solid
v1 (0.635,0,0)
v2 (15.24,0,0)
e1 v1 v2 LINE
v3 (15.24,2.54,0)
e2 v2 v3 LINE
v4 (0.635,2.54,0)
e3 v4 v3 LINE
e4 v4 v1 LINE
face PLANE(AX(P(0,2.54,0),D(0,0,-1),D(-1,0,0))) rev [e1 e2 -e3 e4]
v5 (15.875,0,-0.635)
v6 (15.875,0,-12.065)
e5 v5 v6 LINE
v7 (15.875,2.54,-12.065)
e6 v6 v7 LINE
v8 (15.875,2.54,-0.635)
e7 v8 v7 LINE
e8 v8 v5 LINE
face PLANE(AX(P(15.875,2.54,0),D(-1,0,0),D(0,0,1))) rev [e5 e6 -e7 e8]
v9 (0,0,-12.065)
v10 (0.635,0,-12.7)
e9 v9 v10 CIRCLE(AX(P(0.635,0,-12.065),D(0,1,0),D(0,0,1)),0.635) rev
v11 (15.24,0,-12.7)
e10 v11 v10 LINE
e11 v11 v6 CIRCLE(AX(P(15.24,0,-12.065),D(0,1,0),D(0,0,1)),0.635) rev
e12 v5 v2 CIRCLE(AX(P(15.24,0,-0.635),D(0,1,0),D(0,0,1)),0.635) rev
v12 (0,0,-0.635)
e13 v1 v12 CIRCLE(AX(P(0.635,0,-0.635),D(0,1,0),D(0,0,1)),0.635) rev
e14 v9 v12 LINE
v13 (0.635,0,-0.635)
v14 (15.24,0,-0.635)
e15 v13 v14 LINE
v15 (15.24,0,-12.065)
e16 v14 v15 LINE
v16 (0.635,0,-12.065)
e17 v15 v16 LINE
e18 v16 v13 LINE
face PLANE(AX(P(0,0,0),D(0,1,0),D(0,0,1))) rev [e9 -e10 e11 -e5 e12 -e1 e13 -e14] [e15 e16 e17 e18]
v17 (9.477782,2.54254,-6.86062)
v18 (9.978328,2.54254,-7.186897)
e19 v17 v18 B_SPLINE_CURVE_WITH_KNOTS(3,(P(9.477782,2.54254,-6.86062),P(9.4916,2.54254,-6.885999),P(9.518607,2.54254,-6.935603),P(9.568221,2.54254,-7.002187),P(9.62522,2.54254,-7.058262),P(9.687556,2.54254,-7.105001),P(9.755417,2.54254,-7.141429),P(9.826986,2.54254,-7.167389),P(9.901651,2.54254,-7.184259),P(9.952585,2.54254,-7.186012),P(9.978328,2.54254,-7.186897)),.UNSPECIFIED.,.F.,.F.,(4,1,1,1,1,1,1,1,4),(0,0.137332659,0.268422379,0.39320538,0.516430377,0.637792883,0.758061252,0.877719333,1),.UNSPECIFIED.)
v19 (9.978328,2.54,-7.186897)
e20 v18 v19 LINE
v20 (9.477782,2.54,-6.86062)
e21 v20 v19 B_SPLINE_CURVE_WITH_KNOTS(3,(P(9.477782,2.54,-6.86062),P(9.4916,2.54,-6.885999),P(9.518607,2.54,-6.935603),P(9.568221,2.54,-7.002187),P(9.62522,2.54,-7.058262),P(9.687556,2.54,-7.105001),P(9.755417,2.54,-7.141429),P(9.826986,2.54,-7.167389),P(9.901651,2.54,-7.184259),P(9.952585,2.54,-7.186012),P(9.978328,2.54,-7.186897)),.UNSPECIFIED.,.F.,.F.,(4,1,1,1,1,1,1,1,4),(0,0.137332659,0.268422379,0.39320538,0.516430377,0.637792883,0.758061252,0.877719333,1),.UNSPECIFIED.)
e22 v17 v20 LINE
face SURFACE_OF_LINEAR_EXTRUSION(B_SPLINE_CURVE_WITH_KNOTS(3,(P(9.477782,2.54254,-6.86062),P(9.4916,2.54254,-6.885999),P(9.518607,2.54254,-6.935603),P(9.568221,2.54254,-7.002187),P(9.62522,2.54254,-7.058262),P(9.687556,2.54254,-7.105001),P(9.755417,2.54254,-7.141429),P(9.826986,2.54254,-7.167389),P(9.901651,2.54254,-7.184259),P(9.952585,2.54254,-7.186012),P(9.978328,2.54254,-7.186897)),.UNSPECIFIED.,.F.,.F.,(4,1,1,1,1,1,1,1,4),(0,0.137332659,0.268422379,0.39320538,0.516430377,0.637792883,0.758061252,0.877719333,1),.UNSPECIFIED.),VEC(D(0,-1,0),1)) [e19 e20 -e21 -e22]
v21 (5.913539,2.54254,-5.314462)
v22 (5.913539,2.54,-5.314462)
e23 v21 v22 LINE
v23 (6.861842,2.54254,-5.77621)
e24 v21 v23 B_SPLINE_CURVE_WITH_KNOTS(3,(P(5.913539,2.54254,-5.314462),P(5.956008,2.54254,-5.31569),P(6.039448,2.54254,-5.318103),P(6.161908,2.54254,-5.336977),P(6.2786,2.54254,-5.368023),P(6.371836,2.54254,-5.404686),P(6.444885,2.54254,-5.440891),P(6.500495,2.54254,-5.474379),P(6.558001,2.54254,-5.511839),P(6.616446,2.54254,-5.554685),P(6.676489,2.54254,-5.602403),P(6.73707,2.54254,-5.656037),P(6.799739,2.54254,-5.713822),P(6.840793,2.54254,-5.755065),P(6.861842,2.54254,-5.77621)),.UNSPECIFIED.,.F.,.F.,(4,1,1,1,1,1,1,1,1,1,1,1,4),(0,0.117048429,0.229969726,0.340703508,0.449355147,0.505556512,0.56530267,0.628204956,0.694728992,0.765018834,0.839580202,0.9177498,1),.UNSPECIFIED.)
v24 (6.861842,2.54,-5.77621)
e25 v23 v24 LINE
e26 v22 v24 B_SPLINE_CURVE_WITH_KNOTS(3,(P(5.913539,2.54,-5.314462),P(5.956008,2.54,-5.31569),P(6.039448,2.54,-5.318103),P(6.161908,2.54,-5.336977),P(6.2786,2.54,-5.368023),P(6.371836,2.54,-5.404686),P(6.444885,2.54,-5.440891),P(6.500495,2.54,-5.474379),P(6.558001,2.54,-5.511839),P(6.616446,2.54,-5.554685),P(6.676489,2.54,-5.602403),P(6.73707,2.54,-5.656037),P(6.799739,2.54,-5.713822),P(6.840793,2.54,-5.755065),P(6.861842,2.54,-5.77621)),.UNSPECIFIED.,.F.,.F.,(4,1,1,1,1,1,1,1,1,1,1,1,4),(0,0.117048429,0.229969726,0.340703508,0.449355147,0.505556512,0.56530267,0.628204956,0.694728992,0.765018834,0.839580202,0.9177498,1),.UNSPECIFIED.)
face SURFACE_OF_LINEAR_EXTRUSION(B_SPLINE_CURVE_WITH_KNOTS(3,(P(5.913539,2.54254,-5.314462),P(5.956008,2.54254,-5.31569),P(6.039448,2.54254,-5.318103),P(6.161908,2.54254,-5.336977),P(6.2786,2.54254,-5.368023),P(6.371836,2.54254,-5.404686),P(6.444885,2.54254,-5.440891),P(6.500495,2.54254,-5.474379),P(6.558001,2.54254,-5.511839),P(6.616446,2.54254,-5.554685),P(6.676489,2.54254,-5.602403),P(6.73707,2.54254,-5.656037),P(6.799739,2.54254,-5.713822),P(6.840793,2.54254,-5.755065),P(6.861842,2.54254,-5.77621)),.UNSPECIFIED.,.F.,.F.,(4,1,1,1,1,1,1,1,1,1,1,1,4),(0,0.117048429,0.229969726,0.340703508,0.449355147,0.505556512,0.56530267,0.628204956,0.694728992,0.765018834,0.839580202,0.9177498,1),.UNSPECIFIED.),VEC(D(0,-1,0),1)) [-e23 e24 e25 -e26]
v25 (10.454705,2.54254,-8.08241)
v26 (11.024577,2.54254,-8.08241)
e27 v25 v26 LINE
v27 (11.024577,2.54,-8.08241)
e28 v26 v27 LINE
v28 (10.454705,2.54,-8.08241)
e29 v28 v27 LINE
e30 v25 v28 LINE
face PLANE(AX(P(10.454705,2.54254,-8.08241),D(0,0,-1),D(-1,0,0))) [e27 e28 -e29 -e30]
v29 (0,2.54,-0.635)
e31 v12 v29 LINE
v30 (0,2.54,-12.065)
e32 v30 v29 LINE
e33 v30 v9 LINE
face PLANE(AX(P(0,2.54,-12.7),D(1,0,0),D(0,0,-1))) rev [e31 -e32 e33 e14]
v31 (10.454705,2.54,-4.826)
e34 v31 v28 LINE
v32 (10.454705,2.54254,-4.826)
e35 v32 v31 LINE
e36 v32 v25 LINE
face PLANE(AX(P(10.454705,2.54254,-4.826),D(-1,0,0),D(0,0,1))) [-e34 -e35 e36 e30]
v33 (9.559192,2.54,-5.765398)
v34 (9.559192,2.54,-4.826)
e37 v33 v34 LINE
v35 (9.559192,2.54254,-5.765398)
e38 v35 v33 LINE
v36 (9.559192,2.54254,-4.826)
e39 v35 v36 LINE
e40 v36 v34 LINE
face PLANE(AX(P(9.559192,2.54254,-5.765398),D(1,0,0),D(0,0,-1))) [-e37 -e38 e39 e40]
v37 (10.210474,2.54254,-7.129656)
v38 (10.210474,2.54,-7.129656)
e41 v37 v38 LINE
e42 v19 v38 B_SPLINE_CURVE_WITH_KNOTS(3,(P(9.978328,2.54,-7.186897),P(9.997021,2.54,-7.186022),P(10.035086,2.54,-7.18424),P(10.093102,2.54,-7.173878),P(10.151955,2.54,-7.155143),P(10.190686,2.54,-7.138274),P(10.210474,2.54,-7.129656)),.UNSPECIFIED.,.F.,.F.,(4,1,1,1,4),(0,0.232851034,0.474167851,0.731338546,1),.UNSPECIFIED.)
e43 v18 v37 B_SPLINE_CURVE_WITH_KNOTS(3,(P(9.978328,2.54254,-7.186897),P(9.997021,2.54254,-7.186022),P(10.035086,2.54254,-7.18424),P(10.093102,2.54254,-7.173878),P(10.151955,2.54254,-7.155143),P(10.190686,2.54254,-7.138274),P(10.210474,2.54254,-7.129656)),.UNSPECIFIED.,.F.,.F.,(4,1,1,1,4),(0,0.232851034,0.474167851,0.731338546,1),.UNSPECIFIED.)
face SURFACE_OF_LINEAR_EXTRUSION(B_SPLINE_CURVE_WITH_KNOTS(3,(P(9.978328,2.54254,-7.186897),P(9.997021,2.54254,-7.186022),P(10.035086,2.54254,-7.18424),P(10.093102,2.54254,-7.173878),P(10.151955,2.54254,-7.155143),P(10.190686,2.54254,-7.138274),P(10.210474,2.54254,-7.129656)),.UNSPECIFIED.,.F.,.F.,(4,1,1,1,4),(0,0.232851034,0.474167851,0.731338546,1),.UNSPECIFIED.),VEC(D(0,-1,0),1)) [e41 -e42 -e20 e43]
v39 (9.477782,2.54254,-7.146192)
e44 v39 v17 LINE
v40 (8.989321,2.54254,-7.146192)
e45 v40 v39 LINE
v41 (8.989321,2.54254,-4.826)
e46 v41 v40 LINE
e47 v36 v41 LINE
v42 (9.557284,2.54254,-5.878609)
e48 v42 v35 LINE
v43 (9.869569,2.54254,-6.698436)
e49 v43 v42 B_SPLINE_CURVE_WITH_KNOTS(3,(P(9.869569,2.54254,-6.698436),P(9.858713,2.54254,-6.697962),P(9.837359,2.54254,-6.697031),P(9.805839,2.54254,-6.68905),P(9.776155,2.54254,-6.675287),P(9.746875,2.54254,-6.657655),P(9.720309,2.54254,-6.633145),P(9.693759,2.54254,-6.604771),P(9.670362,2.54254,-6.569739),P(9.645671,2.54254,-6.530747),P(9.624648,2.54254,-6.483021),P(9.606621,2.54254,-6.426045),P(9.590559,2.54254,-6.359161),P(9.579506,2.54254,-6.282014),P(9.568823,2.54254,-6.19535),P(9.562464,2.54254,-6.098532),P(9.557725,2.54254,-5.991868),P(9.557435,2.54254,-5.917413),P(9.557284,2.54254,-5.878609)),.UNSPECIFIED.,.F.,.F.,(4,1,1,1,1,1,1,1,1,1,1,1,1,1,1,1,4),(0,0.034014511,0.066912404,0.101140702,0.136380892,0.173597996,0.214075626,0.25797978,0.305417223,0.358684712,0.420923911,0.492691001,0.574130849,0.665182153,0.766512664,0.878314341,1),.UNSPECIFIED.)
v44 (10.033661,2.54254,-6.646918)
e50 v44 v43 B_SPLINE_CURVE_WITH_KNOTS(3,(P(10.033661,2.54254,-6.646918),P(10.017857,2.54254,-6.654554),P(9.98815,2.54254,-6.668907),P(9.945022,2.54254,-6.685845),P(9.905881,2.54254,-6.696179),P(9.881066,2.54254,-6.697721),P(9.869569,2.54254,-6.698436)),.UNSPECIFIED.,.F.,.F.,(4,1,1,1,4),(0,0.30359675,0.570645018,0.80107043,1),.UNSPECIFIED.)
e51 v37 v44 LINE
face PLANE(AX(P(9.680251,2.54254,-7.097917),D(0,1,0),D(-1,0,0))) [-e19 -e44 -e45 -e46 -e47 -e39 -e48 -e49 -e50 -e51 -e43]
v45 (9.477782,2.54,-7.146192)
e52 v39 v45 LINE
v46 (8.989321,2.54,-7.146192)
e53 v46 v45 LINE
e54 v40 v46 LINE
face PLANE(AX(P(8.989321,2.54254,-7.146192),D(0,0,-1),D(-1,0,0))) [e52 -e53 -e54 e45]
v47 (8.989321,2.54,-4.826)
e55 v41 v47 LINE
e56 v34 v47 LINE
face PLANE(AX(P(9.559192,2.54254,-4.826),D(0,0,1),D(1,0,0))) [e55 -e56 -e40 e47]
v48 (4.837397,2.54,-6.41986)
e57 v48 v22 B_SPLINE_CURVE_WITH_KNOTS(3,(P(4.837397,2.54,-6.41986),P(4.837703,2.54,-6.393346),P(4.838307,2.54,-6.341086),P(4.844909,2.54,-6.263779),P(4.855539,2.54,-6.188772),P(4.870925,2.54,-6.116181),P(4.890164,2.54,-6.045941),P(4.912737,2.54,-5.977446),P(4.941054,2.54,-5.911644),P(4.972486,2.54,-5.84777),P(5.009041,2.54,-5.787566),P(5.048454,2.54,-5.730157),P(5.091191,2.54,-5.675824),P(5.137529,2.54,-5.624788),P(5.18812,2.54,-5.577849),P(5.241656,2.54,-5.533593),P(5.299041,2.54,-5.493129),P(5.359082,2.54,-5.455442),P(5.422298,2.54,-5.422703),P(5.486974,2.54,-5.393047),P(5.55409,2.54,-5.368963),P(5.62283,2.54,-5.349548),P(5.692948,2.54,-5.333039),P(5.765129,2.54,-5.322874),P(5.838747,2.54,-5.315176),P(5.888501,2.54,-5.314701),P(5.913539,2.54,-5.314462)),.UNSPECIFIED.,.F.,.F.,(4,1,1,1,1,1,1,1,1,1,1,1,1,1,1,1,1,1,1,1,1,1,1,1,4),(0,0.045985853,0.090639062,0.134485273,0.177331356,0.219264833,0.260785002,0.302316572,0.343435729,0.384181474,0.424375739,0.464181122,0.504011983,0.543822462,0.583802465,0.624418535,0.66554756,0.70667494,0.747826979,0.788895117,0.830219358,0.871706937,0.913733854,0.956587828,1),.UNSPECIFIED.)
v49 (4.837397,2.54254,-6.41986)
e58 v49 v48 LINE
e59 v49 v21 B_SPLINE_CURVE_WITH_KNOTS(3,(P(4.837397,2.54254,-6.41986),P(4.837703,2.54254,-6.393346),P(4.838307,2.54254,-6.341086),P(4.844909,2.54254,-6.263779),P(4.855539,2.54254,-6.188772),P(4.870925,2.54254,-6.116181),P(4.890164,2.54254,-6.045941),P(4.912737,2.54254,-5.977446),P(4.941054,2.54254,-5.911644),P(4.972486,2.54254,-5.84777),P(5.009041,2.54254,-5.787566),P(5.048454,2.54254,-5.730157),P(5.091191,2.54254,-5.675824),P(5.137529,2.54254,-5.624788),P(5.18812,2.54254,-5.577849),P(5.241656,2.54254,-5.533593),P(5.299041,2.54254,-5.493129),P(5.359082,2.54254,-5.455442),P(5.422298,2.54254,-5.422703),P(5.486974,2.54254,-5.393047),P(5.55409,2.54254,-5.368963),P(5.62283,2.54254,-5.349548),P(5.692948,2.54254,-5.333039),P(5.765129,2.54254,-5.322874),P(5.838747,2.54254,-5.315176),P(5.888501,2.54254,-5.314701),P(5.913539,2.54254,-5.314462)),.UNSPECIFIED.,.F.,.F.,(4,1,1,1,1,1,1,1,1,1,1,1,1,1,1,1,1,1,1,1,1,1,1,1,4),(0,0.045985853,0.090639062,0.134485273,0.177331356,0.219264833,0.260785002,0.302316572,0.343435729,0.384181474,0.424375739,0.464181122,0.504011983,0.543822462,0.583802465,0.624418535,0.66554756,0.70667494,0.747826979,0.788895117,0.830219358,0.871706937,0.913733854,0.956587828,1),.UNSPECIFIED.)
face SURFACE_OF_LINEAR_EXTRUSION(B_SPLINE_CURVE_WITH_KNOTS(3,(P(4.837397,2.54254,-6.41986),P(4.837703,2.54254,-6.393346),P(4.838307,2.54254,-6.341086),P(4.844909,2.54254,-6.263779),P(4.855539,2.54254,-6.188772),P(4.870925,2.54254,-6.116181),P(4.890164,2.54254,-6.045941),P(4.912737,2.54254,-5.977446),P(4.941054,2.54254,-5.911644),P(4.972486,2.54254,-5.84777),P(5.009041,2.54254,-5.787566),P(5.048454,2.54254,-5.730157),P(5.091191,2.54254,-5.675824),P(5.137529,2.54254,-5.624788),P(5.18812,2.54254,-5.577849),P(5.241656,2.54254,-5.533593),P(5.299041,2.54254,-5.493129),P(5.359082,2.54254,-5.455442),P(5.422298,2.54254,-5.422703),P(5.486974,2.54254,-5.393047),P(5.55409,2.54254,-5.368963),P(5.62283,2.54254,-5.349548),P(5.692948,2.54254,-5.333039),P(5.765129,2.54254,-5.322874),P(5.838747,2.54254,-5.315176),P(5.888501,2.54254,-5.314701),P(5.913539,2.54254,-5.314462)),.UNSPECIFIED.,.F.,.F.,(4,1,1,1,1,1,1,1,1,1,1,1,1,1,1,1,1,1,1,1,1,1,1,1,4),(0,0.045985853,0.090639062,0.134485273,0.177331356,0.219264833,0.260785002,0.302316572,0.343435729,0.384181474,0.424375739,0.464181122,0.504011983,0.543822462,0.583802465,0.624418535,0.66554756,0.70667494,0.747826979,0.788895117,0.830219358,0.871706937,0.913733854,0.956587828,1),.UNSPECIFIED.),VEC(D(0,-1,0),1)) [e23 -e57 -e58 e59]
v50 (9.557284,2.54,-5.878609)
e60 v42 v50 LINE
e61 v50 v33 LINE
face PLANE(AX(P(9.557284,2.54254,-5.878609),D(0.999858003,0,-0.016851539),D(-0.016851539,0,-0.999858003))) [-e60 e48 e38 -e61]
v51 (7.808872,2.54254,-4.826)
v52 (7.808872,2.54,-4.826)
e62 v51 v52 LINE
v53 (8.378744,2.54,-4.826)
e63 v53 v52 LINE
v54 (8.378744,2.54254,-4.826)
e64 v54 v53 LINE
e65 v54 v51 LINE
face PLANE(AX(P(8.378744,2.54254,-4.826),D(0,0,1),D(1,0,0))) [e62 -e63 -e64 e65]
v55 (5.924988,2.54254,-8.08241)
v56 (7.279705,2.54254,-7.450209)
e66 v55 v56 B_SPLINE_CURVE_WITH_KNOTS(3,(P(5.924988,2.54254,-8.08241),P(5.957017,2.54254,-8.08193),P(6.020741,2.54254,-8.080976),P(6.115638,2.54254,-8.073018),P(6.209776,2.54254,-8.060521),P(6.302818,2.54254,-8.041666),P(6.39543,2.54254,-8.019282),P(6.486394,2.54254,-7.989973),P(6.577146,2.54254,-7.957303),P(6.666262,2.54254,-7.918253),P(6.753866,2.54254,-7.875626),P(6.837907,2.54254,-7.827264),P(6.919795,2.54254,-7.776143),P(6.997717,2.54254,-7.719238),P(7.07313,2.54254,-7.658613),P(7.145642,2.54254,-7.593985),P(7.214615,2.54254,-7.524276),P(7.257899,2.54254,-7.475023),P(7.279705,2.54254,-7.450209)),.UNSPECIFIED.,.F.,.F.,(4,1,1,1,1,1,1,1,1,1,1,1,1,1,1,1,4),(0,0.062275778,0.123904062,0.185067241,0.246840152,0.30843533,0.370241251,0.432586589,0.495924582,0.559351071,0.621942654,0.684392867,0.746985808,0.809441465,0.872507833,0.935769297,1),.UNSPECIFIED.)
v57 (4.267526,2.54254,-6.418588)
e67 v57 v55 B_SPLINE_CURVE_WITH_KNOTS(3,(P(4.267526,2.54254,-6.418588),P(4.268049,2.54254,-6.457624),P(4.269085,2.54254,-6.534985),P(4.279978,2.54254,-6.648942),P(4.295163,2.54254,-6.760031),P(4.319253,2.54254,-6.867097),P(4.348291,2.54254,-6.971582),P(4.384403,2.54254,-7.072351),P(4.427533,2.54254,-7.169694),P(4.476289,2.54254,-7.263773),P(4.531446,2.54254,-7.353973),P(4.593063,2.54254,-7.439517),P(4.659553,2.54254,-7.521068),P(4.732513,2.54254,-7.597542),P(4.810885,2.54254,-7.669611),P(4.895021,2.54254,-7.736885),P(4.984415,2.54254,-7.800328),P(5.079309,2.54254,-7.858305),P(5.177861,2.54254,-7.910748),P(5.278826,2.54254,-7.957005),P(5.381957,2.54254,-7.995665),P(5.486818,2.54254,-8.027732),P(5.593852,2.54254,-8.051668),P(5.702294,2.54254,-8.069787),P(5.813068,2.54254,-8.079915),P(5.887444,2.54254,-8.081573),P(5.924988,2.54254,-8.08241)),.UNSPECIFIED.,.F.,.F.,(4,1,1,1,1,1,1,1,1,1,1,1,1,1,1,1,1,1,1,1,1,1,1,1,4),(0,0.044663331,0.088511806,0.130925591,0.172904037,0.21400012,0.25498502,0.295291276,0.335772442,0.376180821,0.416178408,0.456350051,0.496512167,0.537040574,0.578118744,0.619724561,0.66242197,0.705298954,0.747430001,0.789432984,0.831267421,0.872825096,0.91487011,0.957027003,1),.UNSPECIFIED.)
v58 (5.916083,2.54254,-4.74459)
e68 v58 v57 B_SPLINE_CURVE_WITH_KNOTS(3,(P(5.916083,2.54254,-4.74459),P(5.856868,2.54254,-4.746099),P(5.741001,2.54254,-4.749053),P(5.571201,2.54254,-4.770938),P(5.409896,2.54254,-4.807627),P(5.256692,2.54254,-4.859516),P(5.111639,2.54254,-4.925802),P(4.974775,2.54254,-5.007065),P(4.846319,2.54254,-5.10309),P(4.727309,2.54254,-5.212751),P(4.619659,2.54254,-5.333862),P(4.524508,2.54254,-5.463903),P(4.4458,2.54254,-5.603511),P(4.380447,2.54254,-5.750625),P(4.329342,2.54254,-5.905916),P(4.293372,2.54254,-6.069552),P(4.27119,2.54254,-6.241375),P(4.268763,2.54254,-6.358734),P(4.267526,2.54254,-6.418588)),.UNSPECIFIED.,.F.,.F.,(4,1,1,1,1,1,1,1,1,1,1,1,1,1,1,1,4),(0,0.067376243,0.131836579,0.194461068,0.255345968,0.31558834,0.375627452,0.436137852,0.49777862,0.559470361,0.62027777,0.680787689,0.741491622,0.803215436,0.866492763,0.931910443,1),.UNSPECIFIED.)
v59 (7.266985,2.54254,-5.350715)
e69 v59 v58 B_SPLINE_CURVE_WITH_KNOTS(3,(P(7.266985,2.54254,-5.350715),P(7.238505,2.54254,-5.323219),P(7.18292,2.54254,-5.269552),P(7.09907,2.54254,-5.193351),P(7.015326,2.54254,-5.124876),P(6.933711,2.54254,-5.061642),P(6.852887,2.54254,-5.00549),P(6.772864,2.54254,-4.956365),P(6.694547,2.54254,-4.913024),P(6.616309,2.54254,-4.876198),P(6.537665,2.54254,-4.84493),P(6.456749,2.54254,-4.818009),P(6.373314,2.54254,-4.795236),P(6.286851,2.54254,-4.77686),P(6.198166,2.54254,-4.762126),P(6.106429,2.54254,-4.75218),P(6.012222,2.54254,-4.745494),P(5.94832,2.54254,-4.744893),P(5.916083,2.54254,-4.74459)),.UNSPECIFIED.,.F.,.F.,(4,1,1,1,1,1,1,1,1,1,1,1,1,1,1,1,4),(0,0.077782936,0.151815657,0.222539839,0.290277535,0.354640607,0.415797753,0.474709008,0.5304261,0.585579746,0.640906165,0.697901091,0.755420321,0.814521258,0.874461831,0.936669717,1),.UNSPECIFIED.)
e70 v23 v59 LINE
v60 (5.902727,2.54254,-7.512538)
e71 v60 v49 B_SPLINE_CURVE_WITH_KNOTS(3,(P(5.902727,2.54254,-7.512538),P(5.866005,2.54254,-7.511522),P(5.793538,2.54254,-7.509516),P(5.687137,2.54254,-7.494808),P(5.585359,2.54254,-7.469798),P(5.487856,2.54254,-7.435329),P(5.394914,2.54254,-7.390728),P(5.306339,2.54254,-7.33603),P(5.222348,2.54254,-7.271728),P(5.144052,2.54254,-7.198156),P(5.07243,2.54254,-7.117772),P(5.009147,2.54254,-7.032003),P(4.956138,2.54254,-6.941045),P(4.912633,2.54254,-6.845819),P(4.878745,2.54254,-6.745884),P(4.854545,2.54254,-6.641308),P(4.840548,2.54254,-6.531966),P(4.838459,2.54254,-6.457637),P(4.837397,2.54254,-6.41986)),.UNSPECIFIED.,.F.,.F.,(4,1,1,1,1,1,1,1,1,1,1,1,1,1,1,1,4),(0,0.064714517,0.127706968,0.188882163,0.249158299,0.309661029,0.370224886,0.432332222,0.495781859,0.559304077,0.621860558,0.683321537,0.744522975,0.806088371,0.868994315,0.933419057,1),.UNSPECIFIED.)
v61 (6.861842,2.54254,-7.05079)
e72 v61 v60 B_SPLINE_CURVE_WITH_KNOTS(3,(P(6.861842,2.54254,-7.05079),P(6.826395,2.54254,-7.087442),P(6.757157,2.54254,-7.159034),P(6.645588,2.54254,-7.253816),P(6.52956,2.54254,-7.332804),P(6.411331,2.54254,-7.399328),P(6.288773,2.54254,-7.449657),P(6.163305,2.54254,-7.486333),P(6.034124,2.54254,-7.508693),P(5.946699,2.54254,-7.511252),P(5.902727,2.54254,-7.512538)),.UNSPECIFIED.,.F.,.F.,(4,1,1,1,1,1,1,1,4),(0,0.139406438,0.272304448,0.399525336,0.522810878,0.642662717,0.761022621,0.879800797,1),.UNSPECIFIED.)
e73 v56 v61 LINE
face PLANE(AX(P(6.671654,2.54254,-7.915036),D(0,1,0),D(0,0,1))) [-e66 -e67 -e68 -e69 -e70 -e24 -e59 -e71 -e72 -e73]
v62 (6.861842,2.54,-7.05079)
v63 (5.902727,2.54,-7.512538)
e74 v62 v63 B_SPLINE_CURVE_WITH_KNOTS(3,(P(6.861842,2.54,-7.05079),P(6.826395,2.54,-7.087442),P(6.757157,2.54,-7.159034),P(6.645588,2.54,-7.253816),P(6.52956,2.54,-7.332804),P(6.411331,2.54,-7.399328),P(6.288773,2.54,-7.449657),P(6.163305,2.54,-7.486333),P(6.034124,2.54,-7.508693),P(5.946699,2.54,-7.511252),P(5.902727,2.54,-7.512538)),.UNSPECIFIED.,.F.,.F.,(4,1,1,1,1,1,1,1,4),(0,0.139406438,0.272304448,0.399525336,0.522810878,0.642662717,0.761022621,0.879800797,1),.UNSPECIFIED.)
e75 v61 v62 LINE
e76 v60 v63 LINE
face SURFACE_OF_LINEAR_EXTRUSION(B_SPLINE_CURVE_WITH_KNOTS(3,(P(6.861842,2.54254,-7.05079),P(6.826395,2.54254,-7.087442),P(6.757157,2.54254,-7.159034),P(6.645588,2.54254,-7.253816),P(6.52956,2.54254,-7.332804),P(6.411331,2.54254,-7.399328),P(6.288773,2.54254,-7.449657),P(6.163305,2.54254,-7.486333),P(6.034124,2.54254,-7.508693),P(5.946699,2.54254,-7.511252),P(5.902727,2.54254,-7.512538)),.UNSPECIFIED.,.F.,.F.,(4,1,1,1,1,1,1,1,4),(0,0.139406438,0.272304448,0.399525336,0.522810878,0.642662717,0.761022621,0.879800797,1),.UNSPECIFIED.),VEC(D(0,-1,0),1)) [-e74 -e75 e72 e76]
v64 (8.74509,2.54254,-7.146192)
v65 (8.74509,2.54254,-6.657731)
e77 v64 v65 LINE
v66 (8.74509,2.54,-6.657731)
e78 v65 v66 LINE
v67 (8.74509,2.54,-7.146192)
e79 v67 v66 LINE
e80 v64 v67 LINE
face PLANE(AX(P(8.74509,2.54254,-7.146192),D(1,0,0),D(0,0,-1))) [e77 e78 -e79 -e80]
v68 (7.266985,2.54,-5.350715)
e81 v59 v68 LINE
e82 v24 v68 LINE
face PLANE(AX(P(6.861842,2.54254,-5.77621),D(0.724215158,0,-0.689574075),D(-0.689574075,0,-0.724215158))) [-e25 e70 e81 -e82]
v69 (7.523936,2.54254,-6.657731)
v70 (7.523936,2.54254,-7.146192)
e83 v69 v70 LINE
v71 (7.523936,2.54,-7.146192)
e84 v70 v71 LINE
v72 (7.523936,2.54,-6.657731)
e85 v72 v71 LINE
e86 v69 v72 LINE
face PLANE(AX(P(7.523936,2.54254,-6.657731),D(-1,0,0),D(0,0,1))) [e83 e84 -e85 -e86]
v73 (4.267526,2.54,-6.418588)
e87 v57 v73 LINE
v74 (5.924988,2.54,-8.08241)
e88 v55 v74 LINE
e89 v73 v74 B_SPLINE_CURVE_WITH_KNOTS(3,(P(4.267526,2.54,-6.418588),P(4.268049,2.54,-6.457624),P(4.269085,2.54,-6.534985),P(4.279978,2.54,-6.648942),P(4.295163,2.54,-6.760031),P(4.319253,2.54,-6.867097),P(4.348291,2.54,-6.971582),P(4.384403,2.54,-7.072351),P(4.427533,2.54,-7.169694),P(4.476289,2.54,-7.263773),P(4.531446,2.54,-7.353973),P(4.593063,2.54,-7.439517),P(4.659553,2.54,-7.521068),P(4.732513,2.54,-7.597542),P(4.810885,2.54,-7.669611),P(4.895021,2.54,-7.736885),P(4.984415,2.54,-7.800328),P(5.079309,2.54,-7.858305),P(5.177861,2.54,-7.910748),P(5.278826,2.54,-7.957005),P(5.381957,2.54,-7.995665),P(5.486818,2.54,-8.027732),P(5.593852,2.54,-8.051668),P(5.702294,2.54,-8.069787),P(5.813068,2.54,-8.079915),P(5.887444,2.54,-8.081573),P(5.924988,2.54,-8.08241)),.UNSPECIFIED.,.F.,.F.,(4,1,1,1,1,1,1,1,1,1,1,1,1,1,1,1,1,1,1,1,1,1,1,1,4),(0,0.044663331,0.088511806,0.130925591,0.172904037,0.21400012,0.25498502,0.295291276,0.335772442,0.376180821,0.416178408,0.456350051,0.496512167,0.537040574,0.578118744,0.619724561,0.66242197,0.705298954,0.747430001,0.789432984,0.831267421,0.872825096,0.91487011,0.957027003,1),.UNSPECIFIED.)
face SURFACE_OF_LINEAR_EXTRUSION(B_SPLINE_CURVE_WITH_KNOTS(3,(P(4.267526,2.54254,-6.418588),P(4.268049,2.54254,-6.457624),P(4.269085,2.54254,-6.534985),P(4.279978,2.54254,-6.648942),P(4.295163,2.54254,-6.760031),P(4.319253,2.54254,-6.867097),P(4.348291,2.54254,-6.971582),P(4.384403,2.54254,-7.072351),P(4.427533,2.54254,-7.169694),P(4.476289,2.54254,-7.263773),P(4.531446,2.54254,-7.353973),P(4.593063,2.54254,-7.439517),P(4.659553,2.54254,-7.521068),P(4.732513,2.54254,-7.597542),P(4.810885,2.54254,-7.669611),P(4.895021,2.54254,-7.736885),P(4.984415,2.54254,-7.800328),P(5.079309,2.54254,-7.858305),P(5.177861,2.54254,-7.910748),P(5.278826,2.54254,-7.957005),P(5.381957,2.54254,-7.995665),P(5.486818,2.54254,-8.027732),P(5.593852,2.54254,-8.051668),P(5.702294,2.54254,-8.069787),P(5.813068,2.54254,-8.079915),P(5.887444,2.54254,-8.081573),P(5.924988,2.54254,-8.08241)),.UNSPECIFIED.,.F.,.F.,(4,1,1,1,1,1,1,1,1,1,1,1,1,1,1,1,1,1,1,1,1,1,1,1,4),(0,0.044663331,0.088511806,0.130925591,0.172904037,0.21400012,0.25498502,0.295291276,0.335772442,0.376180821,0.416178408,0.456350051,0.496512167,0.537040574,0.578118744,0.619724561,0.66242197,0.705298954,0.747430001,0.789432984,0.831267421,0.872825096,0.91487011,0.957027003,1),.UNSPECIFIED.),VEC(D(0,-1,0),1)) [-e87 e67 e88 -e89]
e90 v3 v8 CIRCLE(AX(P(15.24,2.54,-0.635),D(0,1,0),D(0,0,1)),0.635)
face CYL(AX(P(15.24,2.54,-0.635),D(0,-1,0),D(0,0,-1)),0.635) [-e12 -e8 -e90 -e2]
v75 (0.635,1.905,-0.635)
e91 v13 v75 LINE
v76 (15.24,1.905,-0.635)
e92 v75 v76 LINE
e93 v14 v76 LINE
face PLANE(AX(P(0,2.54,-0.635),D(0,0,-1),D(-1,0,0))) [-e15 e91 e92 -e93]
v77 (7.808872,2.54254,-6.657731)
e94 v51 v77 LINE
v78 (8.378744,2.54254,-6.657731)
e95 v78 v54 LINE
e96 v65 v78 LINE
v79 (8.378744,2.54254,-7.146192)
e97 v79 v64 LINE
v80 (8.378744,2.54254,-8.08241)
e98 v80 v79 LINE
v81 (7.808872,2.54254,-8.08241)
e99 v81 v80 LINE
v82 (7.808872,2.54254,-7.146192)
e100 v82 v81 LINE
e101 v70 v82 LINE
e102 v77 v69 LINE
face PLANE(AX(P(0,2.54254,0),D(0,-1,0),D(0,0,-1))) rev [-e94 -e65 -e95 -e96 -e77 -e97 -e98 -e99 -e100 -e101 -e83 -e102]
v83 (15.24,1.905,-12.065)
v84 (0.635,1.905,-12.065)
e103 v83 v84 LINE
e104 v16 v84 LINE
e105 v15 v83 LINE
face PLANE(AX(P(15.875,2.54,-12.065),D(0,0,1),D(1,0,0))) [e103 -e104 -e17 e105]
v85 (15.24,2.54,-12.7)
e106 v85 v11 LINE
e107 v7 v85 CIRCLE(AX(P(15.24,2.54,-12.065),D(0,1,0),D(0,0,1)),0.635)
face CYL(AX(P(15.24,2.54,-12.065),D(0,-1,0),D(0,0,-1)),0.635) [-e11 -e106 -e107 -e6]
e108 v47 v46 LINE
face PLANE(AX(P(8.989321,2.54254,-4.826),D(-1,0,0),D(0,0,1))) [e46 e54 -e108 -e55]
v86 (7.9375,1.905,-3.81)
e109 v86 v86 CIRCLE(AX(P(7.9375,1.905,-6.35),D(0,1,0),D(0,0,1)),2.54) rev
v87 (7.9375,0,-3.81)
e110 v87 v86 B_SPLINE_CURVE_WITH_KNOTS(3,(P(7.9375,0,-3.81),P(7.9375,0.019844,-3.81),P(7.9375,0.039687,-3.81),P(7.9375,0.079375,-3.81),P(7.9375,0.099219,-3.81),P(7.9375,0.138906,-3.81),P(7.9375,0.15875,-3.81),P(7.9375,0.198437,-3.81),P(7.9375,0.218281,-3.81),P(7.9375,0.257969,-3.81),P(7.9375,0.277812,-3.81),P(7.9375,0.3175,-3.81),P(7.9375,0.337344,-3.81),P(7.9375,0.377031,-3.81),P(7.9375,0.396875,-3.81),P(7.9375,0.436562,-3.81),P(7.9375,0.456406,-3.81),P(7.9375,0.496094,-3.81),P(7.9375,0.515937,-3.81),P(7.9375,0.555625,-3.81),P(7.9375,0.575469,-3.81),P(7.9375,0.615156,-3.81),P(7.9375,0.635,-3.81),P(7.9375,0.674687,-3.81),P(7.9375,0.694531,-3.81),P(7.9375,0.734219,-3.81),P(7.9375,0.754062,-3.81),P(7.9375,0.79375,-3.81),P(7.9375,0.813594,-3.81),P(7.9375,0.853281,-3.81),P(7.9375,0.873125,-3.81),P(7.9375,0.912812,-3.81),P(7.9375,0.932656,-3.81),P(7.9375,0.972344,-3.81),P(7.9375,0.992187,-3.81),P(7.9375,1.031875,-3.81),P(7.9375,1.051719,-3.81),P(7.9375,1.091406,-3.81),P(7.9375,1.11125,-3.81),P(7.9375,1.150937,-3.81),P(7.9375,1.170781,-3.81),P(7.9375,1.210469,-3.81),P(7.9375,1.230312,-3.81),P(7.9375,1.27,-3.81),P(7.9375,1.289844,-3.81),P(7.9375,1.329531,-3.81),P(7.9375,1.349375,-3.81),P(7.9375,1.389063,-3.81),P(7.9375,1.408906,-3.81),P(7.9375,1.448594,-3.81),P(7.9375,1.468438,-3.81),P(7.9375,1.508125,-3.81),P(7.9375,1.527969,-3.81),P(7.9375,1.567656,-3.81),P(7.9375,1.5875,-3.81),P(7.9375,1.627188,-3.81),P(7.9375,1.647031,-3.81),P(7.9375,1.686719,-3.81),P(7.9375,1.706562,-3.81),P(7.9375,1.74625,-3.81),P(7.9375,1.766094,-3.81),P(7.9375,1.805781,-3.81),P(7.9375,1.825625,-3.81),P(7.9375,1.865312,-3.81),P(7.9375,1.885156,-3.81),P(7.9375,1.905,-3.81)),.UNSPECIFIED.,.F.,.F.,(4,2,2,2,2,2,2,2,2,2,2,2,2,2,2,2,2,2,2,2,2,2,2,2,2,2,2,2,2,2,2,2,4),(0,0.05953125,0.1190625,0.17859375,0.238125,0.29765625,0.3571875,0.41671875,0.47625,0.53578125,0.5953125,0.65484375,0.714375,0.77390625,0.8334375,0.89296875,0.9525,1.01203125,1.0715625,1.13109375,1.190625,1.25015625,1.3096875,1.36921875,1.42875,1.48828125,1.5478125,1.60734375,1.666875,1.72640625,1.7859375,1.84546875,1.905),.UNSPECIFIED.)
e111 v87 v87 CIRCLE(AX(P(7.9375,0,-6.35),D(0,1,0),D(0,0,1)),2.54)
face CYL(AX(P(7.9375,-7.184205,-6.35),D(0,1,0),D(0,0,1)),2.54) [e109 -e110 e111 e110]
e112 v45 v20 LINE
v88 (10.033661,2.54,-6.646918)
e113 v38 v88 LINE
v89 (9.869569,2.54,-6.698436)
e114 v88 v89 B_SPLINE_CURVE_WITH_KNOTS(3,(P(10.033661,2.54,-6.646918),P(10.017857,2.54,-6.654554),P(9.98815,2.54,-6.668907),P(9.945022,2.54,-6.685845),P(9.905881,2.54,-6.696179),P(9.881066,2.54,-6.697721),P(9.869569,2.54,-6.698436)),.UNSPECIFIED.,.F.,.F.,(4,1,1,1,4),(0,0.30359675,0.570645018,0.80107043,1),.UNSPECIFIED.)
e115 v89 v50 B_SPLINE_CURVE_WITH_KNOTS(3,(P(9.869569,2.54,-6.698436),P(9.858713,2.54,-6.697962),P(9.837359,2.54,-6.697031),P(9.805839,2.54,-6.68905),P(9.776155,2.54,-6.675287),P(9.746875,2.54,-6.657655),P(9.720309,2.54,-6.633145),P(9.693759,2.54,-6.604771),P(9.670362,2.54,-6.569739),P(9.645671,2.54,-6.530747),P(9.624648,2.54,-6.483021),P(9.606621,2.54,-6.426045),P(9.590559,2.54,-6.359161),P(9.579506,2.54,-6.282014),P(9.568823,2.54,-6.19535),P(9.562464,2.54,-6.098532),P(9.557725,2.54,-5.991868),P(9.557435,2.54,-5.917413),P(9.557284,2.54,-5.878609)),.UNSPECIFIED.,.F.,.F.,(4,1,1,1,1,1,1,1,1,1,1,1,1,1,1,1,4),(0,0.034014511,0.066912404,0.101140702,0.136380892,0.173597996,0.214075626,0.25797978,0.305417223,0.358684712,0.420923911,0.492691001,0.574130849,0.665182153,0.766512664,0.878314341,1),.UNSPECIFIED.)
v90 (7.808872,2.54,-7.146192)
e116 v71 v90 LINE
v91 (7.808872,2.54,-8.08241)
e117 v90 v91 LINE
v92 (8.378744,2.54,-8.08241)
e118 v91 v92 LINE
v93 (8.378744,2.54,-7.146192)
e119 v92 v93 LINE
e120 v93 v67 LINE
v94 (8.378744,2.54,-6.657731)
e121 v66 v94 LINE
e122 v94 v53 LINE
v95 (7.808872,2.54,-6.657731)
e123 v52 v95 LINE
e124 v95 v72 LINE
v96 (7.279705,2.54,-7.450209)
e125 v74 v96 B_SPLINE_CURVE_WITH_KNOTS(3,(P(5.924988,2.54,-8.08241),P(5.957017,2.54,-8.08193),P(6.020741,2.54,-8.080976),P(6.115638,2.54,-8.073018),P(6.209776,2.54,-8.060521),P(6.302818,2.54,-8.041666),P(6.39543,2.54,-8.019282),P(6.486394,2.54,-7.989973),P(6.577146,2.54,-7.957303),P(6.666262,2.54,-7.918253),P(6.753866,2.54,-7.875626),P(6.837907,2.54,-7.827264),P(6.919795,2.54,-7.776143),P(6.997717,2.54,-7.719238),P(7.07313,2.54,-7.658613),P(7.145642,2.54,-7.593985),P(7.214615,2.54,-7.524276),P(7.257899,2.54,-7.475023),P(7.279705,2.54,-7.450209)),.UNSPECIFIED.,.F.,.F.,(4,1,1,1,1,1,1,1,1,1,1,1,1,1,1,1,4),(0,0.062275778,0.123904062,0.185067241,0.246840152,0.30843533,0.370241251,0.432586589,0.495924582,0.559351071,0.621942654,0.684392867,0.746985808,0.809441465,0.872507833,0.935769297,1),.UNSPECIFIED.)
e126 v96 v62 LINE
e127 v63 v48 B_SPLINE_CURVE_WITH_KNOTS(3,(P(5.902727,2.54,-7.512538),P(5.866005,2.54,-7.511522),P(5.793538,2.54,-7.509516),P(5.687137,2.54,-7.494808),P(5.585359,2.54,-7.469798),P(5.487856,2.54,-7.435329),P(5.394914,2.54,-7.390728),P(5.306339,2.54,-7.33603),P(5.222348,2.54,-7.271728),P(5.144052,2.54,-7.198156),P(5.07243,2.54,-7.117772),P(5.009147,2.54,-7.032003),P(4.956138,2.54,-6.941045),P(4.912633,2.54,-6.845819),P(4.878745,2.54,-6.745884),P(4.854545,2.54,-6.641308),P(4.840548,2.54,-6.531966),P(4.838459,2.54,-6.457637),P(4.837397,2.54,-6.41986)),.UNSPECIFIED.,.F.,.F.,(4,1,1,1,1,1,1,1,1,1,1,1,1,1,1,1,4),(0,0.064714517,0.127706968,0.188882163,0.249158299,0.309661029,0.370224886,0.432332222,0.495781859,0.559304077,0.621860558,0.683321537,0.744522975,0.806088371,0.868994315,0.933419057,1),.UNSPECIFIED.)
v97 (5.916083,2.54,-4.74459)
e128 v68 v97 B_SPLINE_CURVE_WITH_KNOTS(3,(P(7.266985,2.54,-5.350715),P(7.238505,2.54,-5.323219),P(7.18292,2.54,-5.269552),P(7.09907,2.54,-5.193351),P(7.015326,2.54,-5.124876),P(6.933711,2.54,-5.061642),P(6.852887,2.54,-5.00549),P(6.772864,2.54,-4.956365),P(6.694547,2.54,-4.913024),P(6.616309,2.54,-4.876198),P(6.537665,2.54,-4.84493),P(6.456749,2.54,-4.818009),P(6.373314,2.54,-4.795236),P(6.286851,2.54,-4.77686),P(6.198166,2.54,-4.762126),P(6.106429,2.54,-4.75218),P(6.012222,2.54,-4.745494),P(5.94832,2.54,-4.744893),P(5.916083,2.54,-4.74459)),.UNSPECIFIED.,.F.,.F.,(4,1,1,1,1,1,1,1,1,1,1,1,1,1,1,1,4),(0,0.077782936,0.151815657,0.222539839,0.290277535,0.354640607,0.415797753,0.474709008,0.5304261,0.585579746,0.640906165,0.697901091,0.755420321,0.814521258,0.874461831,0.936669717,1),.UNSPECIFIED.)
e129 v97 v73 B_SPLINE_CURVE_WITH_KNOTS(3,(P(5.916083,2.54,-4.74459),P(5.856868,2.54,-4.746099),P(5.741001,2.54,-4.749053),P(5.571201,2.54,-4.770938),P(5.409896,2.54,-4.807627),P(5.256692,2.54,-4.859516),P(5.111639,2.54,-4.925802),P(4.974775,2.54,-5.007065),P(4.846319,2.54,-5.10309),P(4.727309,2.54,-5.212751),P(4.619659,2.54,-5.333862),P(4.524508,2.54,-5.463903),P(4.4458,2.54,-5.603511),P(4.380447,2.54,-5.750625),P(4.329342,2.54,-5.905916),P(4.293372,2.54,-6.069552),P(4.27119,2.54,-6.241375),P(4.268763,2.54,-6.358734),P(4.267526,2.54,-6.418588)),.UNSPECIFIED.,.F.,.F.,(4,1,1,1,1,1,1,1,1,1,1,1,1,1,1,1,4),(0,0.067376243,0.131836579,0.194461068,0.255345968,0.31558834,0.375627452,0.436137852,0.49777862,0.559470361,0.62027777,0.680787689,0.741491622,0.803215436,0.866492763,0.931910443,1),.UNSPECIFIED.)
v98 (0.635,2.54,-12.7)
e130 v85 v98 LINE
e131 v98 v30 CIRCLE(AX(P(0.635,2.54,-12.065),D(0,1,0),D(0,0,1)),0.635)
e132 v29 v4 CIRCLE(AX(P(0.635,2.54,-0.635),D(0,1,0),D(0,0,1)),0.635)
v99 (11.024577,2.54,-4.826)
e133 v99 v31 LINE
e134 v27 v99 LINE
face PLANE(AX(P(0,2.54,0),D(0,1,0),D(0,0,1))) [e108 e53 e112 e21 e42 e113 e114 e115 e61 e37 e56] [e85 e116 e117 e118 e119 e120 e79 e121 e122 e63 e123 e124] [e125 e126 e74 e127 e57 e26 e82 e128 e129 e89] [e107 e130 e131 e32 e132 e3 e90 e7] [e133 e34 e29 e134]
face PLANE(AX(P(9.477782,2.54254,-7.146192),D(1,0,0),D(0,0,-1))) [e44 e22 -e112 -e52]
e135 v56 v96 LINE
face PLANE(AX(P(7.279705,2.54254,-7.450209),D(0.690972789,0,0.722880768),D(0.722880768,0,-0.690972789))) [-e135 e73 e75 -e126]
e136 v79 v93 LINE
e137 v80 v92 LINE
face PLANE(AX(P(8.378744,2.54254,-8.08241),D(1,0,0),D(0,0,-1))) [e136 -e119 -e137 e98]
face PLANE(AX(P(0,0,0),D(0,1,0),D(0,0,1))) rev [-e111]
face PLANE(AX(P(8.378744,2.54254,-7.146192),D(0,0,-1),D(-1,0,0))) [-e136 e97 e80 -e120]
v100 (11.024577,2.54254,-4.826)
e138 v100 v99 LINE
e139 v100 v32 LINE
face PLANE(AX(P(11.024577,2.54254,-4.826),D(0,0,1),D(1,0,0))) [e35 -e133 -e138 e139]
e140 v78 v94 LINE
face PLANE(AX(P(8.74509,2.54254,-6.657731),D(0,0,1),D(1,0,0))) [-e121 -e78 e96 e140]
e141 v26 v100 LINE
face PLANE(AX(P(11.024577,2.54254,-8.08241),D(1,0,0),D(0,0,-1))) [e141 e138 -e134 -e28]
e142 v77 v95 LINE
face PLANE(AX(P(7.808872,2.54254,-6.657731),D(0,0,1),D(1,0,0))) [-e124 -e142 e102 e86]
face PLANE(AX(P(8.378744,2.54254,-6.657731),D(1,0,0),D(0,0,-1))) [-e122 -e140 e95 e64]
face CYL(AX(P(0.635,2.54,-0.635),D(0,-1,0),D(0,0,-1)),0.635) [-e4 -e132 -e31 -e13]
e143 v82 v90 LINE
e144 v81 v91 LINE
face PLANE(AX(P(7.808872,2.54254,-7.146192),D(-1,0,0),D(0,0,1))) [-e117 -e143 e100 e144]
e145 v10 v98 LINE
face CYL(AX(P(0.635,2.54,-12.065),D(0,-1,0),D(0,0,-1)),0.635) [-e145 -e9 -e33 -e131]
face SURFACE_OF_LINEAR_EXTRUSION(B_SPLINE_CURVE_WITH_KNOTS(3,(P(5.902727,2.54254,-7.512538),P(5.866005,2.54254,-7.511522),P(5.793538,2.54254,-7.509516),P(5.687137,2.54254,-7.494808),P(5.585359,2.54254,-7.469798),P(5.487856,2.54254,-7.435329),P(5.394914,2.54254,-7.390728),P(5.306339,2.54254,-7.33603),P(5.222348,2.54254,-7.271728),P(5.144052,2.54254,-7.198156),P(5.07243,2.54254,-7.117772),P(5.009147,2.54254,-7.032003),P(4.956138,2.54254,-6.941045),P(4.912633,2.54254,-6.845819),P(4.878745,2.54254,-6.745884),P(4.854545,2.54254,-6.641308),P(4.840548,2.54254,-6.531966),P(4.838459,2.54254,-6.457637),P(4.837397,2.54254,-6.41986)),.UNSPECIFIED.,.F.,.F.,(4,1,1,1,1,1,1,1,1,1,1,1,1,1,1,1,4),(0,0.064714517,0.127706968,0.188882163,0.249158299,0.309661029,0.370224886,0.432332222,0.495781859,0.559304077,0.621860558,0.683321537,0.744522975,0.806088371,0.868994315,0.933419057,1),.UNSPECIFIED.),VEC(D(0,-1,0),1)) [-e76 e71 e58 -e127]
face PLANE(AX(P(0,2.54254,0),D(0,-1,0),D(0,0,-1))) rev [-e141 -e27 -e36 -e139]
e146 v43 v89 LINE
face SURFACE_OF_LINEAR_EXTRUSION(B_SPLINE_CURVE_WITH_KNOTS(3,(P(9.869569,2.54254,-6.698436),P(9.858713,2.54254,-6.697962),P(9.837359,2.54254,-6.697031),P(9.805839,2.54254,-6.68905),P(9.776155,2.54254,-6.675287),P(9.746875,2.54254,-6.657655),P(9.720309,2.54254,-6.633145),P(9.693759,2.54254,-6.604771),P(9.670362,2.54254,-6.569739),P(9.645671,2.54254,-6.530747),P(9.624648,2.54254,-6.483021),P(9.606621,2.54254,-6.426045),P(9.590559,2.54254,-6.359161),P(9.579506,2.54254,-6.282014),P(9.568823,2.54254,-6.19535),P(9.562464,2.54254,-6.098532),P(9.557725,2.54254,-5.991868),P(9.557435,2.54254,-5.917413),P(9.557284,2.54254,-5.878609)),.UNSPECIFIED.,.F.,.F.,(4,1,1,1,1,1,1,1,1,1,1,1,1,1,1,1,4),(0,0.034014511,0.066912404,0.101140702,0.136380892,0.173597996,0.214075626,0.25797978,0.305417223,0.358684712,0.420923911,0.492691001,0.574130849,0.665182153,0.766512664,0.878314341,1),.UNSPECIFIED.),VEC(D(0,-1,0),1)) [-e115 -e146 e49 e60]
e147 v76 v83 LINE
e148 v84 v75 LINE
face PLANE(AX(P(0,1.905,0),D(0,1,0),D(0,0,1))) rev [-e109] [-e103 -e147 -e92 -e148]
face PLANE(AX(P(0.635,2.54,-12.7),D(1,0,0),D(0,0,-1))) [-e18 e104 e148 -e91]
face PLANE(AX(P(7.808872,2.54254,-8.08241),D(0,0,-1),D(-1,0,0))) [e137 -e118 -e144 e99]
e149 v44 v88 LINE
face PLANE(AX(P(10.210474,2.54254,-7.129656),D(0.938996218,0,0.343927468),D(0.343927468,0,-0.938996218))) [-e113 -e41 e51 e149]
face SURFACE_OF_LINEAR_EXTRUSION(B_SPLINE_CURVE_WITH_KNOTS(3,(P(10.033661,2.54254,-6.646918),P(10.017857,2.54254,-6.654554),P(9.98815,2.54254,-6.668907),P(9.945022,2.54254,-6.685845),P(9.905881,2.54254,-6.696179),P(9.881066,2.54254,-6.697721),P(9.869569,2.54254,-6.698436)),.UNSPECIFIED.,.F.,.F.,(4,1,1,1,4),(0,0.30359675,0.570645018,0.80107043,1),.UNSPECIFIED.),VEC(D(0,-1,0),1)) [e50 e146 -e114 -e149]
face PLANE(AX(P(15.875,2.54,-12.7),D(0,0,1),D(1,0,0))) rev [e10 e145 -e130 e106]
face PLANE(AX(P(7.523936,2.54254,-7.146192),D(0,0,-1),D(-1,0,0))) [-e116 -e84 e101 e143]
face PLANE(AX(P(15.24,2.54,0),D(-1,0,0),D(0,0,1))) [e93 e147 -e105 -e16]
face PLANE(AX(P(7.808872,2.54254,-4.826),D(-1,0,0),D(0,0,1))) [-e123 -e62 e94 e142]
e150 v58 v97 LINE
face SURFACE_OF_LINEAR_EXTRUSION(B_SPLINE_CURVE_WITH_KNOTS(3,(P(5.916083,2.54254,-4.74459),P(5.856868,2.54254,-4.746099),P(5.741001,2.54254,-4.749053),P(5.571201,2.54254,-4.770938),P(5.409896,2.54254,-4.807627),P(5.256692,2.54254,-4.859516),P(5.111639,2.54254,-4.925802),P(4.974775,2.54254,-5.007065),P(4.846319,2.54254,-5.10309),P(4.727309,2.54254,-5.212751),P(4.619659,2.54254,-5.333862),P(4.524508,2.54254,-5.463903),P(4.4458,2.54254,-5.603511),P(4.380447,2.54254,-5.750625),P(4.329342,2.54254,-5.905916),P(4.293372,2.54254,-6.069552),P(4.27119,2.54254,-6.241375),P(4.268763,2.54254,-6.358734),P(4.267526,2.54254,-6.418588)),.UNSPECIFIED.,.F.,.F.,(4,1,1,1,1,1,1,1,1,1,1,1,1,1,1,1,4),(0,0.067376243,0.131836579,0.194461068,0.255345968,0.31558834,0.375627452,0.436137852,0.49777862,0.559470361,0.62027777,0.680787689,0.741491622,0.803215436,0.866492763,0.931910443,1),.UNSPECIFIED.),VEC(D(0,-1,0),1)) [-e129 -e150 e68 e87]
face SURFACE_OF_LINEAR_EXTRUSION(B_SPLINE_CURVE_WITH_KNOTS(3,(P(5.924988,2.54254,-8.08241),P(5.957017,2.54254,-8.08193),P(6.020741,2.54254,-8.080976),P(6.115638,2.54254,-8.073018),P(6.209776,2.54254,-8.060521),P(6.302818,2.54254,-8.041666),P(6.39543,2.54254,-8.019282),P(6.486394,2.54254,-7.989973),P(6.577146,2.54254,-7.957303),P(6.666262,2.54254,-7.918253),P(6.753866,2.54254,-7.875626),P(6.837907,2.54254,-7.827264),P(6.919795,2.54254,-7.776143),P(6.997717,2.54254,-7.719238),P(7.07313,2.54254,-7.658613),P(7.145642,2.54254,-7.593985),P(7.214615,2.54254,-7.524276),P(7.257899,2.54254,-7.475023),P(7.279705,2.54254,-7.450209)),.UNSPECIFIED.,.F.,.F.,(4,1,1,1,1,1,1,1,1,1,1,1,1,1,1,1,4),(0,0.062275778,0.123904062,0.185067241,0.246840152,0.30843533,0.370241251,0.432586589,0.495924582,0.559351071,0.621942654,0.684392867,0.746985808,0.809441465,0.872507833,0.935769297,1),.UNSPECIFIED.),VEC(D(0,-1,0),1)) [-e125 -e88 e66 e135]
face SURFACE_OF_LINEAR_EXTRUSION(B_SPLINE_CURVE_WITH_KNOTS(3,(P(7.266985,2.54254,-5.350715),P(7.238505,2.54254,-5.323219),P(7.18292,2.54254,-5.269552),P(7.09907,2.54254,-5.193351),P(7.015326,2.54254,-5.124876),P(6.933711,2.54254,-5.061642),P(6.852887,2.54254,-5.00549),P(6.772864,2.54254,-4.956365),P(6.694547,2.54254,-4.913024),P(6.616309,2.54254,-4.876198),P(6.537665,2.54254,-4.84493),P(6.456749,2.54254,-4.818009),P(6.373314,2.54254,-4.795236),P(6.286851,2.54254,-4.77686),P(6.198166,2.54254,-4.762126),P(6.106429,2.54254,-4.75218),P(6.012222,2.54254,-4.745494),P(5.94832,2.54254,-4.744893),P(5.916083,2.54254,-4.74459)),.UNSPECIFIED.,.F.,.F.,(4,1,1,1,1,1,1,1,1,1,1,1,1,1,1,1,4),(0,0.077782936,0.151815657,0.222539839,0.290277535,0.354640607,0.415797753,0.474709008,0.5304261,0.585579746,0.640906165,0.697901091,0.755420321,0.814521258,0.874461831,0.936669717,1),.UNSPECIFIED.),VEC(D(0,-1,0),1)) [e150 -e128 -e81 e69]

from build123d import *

# Parameters (mm, degrees)
SKETCH1_W           = 15.875
SKETCH1_H           = 12.7
BOSS_EXTRUDE1_DEPTH = 2.54
FILLET1_R           = 0.635
SHELL1_START        = 0.635
SHELL1_OUTLINE_W    = 1.905
SHELL1_OUTLINE_H    = 11.43
SHELL1_DEPTH        = 14.605
SKETCH2_R           = 2.54
BOSS_EXTRUDE2_DEPTH = 1.905
SKETCH3_W           = 0.569871795
SKETCH3_H           = 3.256410256
BOSS_EXTRUDE3_DEPTH = 0.00254


# Read off the part's stored shape, not the designer's step: Shell1
with BuildPart() as part:
    # Sketch1 → Boss-Extrude1 (new body)
    with BuildSketch(Plane(origin=(0, 0, 0), x_dir=(1, 0, 0), z_dir=(0, 1, 0))):
        with Locations((7.9375, 6.35)):
            Rectangle(SKETCH1_W, SKETCH1_H)
    extrude(amount=BOSS_EXTRUDE1_DEPTH)

    # Fillet1
    fillet1_edges = [part.edges().sort_by_distance(p)[0] for p in [
        (0, 1.27, -12.7),
        (15.875, 1.27, -12.7),
        (15.875, 1.27, 0),
        (0, 1.27, 0),
    ]]
    fillet(fillet1_edges, radius=FILLET1_R)

    # Shell1 outline → Shell1 (cut)
    with BuildSketch(Plane.YZ.offset(SHELL1_START)):
        with Locations((0.9525, -6.35)):
            Rectangle(SHELL1_OUTLINE_W, SHELL1_OUTLINE_H)
    extrude(amount=SHELL1_DEPTH, mode=Mode.SUBTRACT)

    # Sketch2 → Boss-Extrude2 (add)
    with BuildSketch(Plane(origin=(0, 1.905, 0), x_dir=(-1, 0, 0), z_dir=(0, -1, 0))):
        with Locations(Location((-7.9375, 6.35, 0), (0, 0, 270))):
            Circle(SKETCH2_R)
    extrude(amount=BOSS_EXTRUDE2_DEPTH)

    # Sketch3 → Boss-Extrude3 (add)
    with BuildSketch(Plane(origin=(0, 2.54, 0), x_dir=(1, 0, 0), z_dir=(0, 1, 0))):
        with BuildLine():
            Line((7.279705128, 7.450208734), (6.861841546, 7.050789663))
            add(Edge.make_bspline(
                [(6.861841546, 7.050789663), (6.826394953, 7.0874415), (6.757156652, 7.15903402), (6.645587691, 7.253816208), (6.529560035, 7.332804336), (6.411330769, 7.399327635), (6.288773291, 7.449657252), (6.163304701, 7.486333291), (6.034123843, 7.508693286), (5.946699207, 7.511251666), (5.902726963, 7.512538462)],
                knots=[0, 0, 0, 0, 1.115251505, 2.178435587, 3.19620269, 4.182487026, 5.141301733, 6.088180966, 7.038406374, 8, 8, 8, 8], degree=3))
            add(Edge.make_bspline(
                [(5.902726963, 7.512538462), (5.866004796, 7.511521848), (5.793537645, 7.509515672), (5.687136877, 7.494808428), (5.585359044, 7.469798119), (5.487855743, 7.435329281), (5.394913883, 7.390728433), (5.3063386, 7.336030097), (5.222348271, 7.271728275), (5.144052361, 7.198155668), (5.072430014, 7.117772066), (5.00914711, 7.032002955), (4.956137527, 6.941044826), (4.912633425, 6.845818837), (4.87874541, 6.745884235), (4.854545111, 6.6413083), (4.840548304, 6.531966489), (4.838459187, 6.457636741), (4.837397436, 6.419860176)],
                knots=[0, 0, 0, 0, 1.035432265, 2.043311493, 3.022114605, 3.98653278, 4.95457646, 5.923598177, 6.917315552, 7.932509744, 8.948865224, 9.949768934, 10.933144597, 11.912367597, 12.897413939, 13.903909035, 14.934704909, 16, 16, 16, 16], degree=3))
            add(Edge.make_bspline(
                [(4.837397436, 6.419860176), (4.83770342, 6.39334594), (4.838306522, 6.341085836), (4.844908537, 6.263778637), (4.855539337, 6.188772378), (4.870924739, 6.116180674), (4.890164335, 6.045940615), (4.912736762, 5.977446244), (4.941053539, 5.911643999), (4.97248559, 5.847769629), (5.009040702, 5.787566028), (5.048453857, 5.730156898), (5.091190988, 5.675823652), (5.137528908, 5.624788408), (5.188119763, 5.577848731), (5.241655968, 5.533593089), (5.299040605, 5.493129351), (5.359081648, 5.455442035), (5.422297778, 5.422702743), (5.486973793, 5.39304727), (5.554090313, 5.368962616), (5.622830153, 5.349548188), (5.692947662, 5.333039117), (5.765128654, 5.322873974), (5.83874741, 5.315176031), (5.888501332, 5.314700728), (5.913539263, 5.314461538)],
                knots=[0, 0, 0, 0, 1.103660481, 2.175337485, 3.227646561, 4.255952547, 5.262355991, 6.258840057, 7.255597736, 8.242457506, 9.22035537, 10.185017736, 11.140346927, 12.096287581, 13.051739095, 14.01125915, 14.986044842, 15.97314143, 16.960198552, 17.947847494, 18.933482797, 19.925264591, 20.920966487, 21.929612487, 22.958107872, 24, 24, 24, 24], degree=3))
            add(Edge.make_bspline(
                [(5.913539263, 5.314461538), (5.956007897, 5.315689957), (6.039447719, 5.318103479), (6.161907656, 5.336976883), (6.278599775, 5.368022564), (6.37183622, 5.40468571), (6.444884512, 5.440891042), (6.500495097, 5.474379191), (6.558000776, 5.511839363), (6.616446429, 5.554685345), (6.676489454, 5.602402968), (6.737069952, 5.656037337), (6.799738796, 5.713822348), (6.840792535, 5.755064647), (6.861841546, 5.776210337)],
                knots=[0, 0, 0, 0, 1.404581149, 2.759636711, 4.088442092, 5.392261763, 6.066678138, 6.783632037, 7.538459478, 8.336747902, 9.180226004, 10.074962426, 11.012997595, 12, 12, 12, 12], degree=3))
            Line((6.861841546, 5.776210337), (7.266984776, 5.350714543))
            add(Edge.make_bspline(
                [(7.266984776, 5.350714543), (7.238505387, 5.323218588), (7.182919712, 5.269552363), (7.099070264, 5.193351332), (7.015326343, 5.124876235), (6.933711029, 5.061641725), (6.852887378, 5.005489979), (6.77286396, 4.956364915), (6.694546676, 4.91302409), (6.616309243, 4.876198427), (6.537664826, 4.844929614), (6.456748963, 4.818009219), (6.373314287, 4.795235533), (6.286851216, 4.776860159), (6.198166225, 4.76212559), (6.106429341, 4.752179841), (6.012222221, 4.745493645), (5.948320072, 4.744892834), (5.916083333, 4.744589744)],
                knots=[0, 0, 0, 0, 1.244526981, 2.429050516, 3.560637417, 4.644440555, 5.67424972, 6.652764056, 7.595344123, 8.486817594, 9.369275933, 10.254498637, 11.166417451, 12.086725134, 13.032340136, 13.991389299, 14.986715468, 16, 16, 16, 16], degree=3))
            add(Edge.make_bspline(
                [(5.916083333, 4.744589744), (5.856868437, 4.746099249), (5.741001344, 4.749052933), (5.57120114, 4.770937726), (5.409895505, 4.807627196), (5.256692012, 4.859516227), (5.111639375, 4.925802032), (4.974774704, 5.007065316), (4.846318595, 5.103090176), (4.727308719, 5.212751107), (4.619658622, 5.333862399), (4.524508403, 5.463902701), (4.445800139, 5.603511114), (4.380446971, 5.750625175), (4.329341653, 5.905916222), (4.293372173, 6.069552234), (4.271190057, 6.24137521), (4.268763302, 6.358734263), (4.267525641, 6.418588141)],
                knots=[0, 0, 0, 0, 1.078019885, 2.10938526, 3.111377082, 4.085535484, 5.04941344, 6.010039228, 6.978205633, 7.964457913, 8.951525778, 9.924444315, 10.892603023, 11.863865945, 12.85144698, 13.863884204, 14.910567087, 16, 16, 16, 16], degree=3))
            add(Edge.make_bspline(
                [(4.267525641, 6.418588141), (4.268048616, 6.45762433), (4.269085026, 6.534984515), (4.279977786, 6.648942336), (4.295162928, 6.760030827), (4.319252774, 6.867096523), (4.348290707, 6.971581794), (4.384403193, 7.072351009), (4.427532553, 7.169693788), (4.476288628, 7.263773089), (4.531445888, 7.353972592), (4.593062603, 7.43951734), (4.659552517, 7.521067724), (4.732513276, 7.597541827), (4.810884664, 7.669611105), (4.895020519, 7.736885002), (4.984414805, 7.800328301), (5.07930948, 7.858304953), (5.177860994, 7.910747916), (5.278826351, 7.95700485), (5.381957492, 7.995664994), (5.486818369, 8.027732158), (5.593852019, 8.051668028), (5.702294461, 8.06978671), (5.813068412, 8.079915169), (5.887443523, 8.081573262), (5.92498758, 8.082410256)],
                knots=[0, 0, 0, 0, 1.071919942, 2.124283339, 3.142214191, 4.149696895, 5.136002878, 6.119640489, 7.086990633, 8.058538607, 9.028339693, 9.988281803, 10.952401235, 11.916291999, 12.888973767, 13.874849856, 14.873389453, 15.898127285, 16.927174885, 17.938320013, 18.946391617, 19.950418109, 20.947802303, 21.956882652, 22.968648068, 24, 24, 24, 24], degree=3))
            add(Edge.make_bspline(
                [(5.92498758, 8.082410256), (5.95701651, 8.08193047), (6.020741359, 8.080975887), (6.115638353, 8.073018393), (6.209776405, 8.060521229), (6.302818472, 8.041665671), (6.395430086, 8.01928174), (6.486394226, 7.98997307), (6.577145903, 7.957303034), (6.666261809, 7.918252678), (6.753866337, 7.875625686), (6.837907215, 7.827263816), (6.91979548, 7.776143202), (6.997716537, 7.719238304), (7.073130016, 7.658613168), (7.145641572, 7.593984943), (7.214614876, 7.524276087), (7.257898691, 7.475022665), (7.279705128, 7.450208734)],
                knots=[0, 0, 0, 0, 0.996412454, 1.982464992, 2.961075852, 3.949442424, 4.934965278, 5.923860011, 6.921385422, 7.934793307, 8.949617135, 9.951082467, 10.950285876, 11.951772932, 12.951063433, 13.960125323, 14.972308753, 16, 16, 16, 16], degree=3))
        make_face()
        Polygon((7.808871795, 8.082410256), (8.37874359, 8.082410256), (8.37874359, 7.146192308), (8.745089744, 7.146192308), (8.745089744, 6.657730769), (8.37874359, 6.657730769), (8.37874359, 4.826), (7.808871795, 4.826), (7.808871795, 6.657730769), (7.523935897, 6.657730769), (7.523935897, 7.146192308), (7.808871795, 7.146192308), align=None)
        with BuildLine():
            Line((8.989320513, 7.146192308), (9.477782051, 7.146192308))
            Line((9.477782051, 7.146192308), (9.477782051, 6.860620393))
            add(Edge.make_bspline(
                [(9.477782051, 6.860620393), (9.49159969, 6.885999247), (9.51860684, 6.935603272), (9.568221237, 7.002186851), (9.625220267, 7.058261684), (9.687555778, 7.105000626), (9.755416695, 7.141429043), (9.826985825, 7.167388882), (9.901650896, 7.18425918), (9.952584876, 7.186011685), (9.978327925, 7.186897436)],
                knots=[0, 0, 0, 0, 1.09866127, 2.147379032, 3.14564304, 4.131443017, 5.102343063, 6.064490016, 7.021754664, 8, 8, 8, 8], degree=3))
            add(Edge.make_bspline(
                [(9.978327925, 7.186897436), (9.99702059, 7.186022129), (10.035085533, 7.184239691), (10.093101861, 7.173878355), (10.151955263, 7.155143087), (10.190685873, 7.138274469), (10.210474359, 7.129655849)],
                knots=[0, 0, 0, 0, 0.931404136, 1.896671404, 2.925354185, 4, 4, 4, 4], degree=3))
            Line((10.210474359, 7.129655849), (10.033661458, 6.64691847))
            add(Edge.make_bspline(
                [(10.033661458, 6.64691847), (10.01785691, 6.654554463), (9.988150443, 6.668907192), (9.945021811, 6.68584489), (9.905880789, 6.696179446), (9.8810661, 6.697721452), (9.86956891, 6.698435897)],
                knots=[0, 0, 0, 0, 1.214386998, 2.282580073, 3.20428172, 4, 4, 4, 4], degree=3))
            add(Edge.make_bspline(
                [(9.86956891, 6.698435897), (9.858713328, 6.697962468), (9.837358527, 6.697031151), (9.805839437, 6.689050083), (9.776155019, 6.675286977), (9.746874781, 6.657655073), (9.720308609, 6.633145407), (9.693758846, 6.604771118), (9.670361774, 6.569739283), (9.645671077, 6.530747072), (9.624647831, 6.483020641), (9.606621046, 6.426045117), (9.590559035, 6.359161255), (9.579506178, 6.282013934), (9.568823149, 6.195349687), (9.562464348, 6.098532411), (9.557725052, 5.991868249), (9.557435276, 5.917412815), (9.557284255, 5.878609175)],
                knots=[0, 0, 0, 0, 0.544232178, 1.070598461, 1.618251235, 2.182094276, 2.777567932, 3.425210017, 4.127676488, 4.886675562, 5.738955394, 6.734782583, 7.883056018, 9.186093582, 10.642914445, 12.264202625, 14.053029461, 16, 16, 16, 16], degree=3))
            Line((9.557284255, 5.878609175), (9.559192308, 5.765398037))
            Line((9.559192308, 5.765398037), (9.559192308, 4.826))
            Line((9.559192308, 4.826), (8.989320513, 4.826))
            Line((8.989320513, 4.826), (8.989320513, 7.146192308))
        make_face()
        with Locations((10.739641026, 6.454205128)):
            Rectangle(SKETCH3_W, SKETCH3_H)
    extrude(amount=BOSS_EXTRUDE3_DEPTH)


solid = part.part
